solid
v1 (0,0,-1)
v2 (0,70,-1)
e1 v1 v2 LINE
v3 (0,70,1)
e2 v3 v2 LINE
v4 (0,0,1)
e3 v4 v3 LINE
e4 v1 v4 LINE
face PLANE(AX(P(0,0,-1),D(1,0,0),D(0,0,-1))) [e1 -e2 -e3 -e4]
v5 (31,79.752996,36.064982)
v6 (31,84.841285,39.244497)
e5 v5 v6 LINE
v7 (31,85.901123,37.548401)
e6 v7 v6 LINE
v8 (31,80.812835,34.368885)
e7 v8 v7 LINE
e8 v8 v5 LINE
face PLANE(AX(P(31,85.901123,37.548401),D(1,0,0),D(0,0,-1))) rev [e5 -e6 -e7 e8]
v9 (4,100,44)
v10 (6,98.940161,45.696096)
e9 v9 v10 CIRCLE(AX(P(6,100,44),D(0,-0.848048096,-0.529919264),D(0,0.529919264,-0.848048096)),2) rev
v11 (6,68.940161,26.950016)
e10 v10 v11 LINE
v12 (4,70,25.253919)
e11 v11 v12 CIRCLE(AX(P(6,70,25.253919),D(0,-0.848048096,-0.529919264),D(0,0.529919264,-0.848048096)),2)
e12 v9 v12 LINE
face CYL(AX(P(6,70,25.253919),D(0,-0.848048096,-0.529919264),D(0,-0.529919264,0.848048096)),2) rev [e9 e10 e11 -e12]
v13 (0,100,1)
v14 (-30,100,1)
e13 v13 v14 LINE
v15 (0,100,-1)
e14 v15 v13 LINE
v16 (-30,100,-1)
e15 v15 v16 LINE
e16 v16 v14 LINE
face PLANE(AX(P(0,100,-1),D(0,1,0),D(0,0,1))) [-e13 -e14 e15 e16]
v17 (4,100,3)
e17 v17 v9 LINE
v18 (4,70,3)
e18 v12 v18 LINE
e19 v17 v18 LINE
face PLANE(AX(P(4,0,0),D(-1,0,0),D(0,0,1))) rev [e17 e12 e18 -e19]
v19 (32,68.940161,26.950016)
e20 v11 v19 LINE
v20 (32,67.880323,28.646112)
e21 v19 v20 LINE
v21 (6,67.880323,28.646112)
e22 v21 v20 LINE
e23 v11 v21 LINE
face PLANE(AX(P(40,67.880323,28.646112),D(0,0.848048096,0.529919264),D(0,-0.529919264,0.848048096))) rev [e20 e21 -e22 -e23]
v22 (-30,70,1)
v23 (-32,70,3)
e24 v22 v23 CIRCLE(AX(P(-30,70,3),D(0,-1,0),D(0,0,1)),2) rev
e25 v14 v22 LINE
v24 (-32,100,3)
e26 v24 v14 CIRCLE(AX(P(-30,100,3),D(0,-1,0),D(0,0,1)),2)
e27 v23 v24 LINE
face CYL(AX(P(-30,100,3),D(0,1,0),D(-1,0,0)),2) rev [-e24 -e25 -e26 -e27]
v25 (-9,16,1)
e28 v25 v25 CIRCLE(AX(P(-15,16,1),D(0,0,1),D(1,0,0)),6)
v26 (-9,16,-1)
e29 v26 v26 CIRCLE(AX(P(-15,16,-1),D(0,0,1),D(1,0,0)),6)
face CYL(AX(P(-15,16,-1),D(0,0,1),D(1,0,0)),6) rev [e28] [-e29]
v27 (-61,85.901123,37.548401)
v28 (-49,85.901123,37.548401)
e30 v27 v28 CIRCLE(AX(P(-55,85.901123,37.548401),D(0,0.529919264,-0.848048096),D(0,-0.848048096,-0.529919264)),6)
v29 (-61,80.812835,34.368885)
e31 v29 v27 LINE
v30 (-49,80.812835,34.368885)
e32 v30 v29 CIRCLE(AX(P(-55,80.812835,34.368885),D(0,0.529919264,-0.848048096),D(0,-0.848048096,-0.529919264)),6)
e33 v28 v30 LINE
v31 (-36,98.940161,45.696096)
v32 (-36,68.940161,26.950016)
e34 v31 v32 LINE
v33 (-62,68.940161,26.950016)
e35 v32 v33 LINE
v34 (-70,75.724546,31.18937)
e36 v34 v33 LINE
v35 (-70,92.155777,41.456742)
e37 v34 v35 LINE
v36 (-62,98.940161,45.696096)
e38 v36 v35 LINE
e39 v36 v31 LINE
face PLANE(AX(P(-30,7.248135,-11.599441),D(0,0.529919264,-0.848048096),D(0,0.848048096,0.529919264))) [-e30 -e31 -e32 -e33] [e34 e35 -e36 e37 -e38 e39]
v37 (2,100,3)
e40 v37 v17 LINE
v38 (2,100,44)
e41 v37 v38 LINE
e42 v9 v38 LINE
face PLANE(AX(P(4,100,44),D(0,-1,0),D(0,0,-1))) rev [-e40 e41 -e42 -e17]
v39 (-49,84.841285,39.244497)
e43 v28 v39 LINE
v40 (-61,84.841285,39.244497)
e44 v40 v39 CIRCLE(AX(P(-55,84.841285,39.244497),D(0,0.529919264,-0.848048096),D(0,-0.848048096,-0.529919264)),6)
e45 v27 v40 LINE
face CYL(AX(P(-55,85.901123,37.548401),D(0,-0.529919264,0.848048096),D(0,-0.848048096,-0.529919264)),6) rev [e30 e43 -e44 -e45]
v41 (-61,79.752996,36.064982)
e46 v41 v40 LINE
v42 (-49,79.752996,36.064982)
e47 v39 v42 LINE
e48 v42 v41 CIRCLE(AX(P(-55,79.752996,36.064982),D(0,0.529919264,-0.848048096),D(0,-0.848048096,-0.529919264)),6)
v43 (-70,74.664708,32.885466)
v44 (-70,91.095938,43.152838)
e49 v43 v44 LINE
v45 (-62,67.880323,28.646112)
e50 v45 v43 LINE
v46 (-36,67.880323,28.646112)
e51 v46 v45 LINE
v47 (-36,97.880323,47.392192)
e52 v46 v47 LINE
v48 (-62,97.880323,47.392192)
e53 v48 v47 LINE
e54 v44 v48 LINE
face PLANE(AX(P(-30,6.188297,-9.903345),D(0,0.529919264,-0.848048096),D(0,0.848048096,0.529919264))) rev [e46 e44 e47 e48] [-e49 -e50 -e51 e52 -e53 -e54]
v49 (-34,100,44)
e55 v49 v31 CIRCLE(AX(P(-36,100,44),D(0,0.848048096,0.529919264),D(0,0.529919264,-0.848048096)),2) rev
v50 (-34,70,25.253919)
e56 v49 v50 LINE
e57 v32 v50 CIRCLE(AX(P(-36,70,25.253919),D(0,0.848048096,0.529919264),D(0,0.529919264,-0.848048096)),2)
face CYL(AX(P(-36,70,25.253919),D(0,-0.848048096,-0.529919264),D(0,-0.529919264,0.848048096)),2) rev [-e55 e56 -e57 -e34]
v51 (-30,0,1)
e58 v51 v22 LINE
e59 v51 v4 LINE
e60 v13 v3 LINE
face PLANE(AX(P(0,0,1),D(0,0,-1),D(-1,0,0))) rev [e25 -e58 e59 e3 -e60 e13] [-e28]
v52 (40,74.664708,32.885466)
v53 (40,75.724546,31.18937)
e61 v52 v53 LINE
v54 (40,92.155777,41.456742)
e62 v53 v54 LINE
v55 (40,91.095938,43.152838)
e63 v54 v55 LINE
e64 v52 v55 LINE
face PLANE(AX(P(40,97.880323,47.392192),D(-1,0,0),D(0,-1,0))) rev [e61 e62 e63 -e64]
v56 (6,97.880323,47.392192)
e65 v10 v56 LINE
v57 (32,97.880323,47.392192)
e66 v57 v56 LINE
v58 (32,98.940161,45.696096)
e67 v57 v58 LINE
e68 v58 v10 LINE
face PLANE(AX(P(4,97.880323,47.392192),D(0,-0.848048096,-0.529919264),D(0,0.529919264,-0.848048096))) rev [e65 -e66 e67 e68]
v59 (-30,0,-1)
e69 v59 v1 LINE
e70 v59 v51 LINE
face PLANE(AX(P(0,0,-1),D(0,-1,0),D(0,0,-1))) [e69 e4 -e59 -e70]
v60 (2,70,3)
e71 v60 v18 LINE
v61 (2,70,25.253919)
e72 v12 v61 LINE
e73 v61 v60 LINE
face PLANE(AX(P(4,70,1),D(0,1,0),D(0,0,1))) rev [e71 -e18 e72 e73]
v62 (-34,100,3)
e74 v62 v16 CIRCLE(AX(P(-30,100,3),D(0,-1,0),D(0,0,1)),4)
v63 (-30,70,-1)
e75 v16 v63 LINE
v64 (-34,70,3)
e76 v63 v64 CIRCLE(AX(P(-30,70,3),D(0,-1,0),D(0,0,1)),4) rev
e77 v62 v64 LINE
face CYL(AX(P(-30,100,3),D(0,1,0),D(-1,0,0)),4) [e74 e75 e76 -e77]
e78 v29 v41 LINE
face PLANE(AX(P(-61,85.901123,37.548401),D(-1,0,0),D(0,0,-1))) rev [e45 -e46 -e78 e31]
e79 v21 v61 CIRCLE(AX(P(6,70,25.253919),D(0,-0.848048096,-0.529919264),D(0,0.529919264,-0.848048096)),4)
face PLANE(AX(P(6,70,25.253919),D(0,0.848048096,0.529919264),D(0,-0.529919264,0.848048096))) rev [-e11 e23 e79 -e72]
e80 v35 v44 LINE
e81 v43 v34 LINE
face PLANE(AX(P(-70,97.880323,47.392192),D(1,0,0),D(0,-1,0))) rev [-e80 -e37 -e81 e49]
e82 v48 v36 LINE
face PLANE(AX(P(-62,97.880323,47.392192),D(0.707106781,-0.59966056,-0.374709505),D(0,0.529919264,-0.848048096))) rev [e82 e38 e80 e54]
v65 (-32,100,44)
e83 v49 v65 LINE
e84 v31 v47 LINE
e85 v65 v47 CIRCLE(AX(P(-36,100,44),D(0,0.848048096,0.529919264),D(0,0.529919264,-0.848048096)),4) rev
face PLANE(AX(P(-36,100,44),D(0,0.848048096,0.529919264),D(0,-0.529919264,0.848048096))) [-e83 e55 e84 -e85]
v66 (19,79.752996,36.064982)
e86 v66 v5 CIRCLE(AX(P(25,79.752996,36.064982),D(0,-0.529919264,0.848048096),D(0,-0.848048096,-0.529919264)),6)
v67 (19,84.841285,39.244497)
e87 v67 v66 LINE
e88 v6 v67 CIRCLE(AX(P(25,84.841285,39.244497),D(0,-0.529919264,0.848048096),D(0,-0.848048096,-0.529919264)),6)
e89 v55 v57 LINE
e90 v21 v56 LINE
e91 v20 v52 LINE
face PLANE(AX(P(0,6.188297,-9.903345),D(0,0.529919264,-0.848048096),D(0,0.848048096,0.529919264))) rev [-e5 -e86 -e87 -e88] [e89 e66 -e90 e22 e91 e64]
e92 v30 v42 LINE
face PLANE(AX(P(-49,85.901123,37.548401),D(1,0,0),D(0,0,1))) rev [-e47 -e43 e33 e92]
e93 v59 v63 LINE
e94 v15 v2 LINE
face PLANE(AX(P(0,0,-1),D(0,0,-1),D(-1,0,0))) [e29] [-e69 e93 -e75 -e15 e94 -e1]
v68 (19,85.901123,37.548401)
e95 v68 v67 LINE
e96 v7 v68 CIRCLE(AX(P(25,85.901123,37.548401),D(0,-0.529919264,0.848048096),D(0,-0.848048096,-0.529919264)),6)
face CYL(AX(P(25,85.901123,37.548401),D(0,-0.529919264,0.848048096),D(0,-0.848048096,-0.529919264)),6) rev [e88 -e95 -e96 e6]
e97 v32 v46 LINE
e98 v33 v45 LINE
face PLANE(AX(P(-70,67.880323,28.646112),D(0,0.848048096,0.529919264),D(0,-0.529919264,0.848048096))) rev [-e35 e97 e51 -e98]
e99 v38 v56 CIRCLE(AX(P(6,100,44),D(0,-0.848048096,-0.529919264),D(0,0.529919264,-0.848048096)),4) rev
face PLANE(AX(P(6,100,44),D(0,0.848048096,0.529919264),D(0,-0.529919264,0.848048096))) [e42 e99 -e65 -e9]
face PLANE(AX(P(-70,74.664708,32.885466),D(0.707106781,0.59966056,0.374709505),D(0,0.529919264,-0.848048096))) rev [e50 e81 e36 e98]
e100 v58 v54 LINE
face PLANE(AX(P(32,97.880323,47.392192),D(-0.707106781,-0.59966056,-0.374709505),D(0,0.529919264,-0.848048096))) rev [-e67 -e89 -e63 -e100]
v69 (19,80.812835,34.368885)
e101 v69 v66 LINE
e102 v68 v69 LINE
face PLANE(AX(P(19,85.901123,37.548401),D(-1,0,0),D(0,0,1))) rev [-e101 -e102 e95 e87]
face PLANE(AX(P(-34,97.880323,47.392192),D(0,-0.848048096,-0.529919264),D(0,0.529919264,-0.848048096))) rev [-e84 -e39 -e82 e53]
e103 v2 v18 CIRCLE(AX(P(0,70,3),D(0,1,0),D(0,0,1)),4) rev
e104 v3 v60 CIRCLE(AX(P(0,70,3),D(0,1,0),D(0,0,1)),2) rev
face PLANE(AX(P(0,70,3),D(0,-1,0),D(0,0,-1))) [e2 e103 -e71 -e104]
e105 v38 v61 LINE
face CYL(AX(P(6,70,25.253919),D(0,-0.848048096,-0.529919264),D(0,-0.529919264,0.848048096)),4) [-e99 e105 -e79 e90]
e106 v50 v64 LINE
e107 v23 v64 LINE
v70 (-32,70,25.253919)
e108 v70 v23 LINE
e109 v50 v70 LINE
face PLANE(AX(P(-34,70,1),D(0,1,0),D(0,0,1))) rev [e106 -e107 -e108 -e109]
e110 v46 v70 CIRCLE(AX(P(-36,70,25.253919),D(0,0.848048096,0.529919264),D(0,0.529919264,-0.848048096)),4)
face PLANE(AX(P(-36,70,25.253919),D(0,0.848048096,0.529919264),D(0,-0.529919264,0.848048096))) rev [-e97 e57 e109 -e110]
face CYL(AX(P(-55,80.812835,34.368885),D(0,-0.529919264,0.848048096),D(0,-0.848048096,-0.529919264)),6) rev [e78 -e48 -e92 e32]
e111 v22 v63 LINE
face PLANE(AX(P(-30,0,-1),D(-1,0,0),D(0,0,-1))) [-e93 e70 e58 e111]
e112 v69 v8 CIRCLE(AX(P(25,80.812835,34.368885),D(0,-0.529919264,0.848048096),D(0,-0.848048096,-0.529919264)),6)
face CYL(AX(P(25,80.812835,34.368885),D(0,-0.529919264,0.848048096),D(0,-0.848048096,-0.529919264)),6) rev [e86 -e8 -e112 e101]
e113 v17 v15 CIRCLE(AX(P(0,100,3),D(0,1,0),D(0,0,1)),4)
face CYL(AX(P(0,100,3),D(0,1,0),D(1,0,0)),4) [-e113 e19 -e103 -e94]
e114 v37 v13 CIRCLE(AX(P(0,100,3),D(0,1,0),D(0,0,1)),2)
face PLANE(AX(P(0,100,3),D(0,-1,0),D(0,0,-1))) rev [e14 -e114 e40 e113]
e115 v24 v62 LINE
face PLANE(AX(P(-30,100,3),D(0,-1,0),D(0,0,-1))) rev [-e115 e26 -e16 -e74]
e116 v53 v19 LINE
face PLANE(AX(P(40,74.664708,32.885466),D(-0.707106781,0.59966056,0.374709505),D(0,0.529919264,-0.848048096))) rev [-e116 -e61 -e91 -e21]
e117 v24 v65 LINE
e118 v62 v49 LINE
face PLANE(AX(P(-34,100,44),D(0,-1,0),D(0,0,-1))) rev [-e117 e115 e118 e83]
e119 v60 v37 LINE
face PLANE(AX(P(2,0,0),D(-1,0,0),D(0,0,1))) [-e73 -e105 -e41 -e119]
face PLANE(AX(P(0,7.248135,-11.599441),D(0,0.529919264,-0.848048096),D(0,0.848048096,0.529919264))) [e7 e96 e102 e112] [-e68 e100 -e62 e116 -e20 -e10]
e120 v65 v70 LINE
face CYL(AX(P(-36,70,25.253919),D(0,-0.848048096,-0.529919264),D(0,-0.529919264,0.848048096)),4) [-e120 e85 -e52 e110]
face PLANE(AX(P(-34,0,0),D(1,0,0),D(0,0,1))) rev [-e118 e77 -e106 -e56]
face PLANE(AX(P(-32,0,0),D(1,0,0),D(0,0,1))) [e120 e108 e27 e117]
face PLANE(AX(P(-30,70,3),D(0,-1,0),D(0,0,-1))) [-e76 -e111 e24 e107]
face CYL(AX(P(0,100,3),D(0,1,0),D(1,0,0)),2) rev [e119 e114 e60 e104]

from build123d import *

# Parameters (mm, degrees)
BASE_FLANGE1_START      = -1
BASE_FLANGE1_OUTLINE_W  = 100
BASE_FLANGE1_OUTLINE_H  = 30
BASE_FLANGE1_DEPTH      = 2
EDGE_FLANGE1_DEPTH      = 30
EDGE_FLANGE1_START      = 2
EDGE_FLANGE1_FLAT_DEPTH = 2
SKETCH11_R              = 6
CUT_EXTRUDE2_DEPTH      = 2
EDGE_FLANGE2_DEPTH      = 35.375352101
CUT_EXTRUDE1_DEPTH      = 10
CHAMFER1_SIZE           = 8


# Read off the part's stored shape, not the designer's step: Base-Flange1
# Sheet-metal steps are written as plain solids
with BuildPart() as part:
    # Base-Flange1 outline → Base-Flange1 (new body)
    with BuildSketch(Plane(origin=(0, 0, 0), x_dir=(0, 1, 0), z_dir=(0, 0, 1)).offset(BASE_FLANGE1_START)):
        with Locations((50, 15)):
            Rectangle(BASE_FLANGE1_OUTLINE_W, BASE_FLANGE1_OUTLINE_H)
    extrude(amount=BASE_FLANGE1_DEPTH)

    # Edge-Flange1 bend section (across the edge) → Edge-Flange1 (add)
    with BuildSketch(Plane(origin=(2, 70, 1), x_dir=(-1, 0, 0), z_dir=(0, 1, 0))):
        with BuildLine():
            Line((-2, 2), (0, 2))
            ThreePointArc((0, 2), (0.585786438, 0.585786438), (2, 0))
            Line((2, 0), (2, -2))
            ThreePointArc((2, -2), (-0.828427125, -0.828427125), (-2, 2))
        make_face()
    extrude(amount=EDGE_FLANGE1_DEPTH)

    # Edge-Flange1 profile (on flange) → Edge-Flange1 flat (add)
    with BuildSketch(Plane(origin=(2, 0, 1), x_dir=(0, 1, 0), z_dir=(1, 0, 0)).offset(EDGE_FLANGE1_START)):
        Polygon((70, 2), (100, 2), (100, 43), (70, 24.253919443), align=None)
    extrude(amount=-EDGE_FLANGE1_FLAT_DEPTH)

    # Sketch11 → Cut-Extrude2 (cut)
    with BuildSketch(Plane.XY.offset(1)):
        with Locations((-15, 16)):
            Circle(SKETCH11_R)
    extrude(amount=-CUT_EXTRUDE2_DEPTH, mode=Mode.SUBTRACT)

    # Edge-Flange2 section (across the edge) → Edge-Flange2 (add)
    with BuildSketch(Plane(origin=(4, 98.940161472, 45.696096192), x_dir=(0, 0.5299192642332061, -0.8480480961564253), z_dir=(-1.8389111764499846e-15, -0.8480480961564253, -0.5299192642332061))):
        with BuildLine():
            Line((-2, 2), (-2, 36))
            Line((-2, 36), (0, 36))
            Line((0, 36), (0, 2))
            ThreePointArc((0, 2), (0.585786438, 0.585786438), (2, 0))
            Line((2, 0), (2, -2))
            ThreePointArc((2, -2), (-0.828427125, -0.828427125), (-2, 2))
        make_face()
    extrude(amount=EDGE_FLANGE2_DEPTH)

    # Sketch15 → Cut-Extrude1 (cut)
    with BuildSketch(Plane(origin=(0, 6.188296585, -9.903344701), x_dir=(1, 0, 0), z_dir=(0, -0.5299192642332063, 0.8480480961564252))):
        with BuildLine():
            Line((31, 92.745905141), (31, 86.745905141))
            ThreePointArc((31, 86.745905141), (25, 80.745905141), (19, 86.745905141))
            Line((19, 86.745905141), (19, 92.745905141))
            ThreePointArc((19, 92.745905141), (25, 98.745905141), (31, 92.745905141))
        make_face()
    extrude(amount=-CUT_EXTRUDE1_DEPTH, mode=Mode.SUBTRACT)

    # Chamfer1
    chamfer1_edges = [part.edges().sort_by_distance(p)[0] for p in [
        (40, 98.410242207, 46.544144288),
        (40, 68.410242207, 27.798063731),
    ]]
    chamfer(chamfer1_edges, length=CHAMFER1_SIZE)

    # SurfaceCut1
    split(bisect_by=Plane.YZ.offset(-15), keep=Keep.TOP)

    # Mirror1: part across plane


with BuildPart() as part_1:
    add(part.part)
    add(part.part.mirror(Plane(origin=(-15, 0, 0), x_dir=(0, 0, 1), z_dir=(1, 0, 0))))


solid = part_1.part
